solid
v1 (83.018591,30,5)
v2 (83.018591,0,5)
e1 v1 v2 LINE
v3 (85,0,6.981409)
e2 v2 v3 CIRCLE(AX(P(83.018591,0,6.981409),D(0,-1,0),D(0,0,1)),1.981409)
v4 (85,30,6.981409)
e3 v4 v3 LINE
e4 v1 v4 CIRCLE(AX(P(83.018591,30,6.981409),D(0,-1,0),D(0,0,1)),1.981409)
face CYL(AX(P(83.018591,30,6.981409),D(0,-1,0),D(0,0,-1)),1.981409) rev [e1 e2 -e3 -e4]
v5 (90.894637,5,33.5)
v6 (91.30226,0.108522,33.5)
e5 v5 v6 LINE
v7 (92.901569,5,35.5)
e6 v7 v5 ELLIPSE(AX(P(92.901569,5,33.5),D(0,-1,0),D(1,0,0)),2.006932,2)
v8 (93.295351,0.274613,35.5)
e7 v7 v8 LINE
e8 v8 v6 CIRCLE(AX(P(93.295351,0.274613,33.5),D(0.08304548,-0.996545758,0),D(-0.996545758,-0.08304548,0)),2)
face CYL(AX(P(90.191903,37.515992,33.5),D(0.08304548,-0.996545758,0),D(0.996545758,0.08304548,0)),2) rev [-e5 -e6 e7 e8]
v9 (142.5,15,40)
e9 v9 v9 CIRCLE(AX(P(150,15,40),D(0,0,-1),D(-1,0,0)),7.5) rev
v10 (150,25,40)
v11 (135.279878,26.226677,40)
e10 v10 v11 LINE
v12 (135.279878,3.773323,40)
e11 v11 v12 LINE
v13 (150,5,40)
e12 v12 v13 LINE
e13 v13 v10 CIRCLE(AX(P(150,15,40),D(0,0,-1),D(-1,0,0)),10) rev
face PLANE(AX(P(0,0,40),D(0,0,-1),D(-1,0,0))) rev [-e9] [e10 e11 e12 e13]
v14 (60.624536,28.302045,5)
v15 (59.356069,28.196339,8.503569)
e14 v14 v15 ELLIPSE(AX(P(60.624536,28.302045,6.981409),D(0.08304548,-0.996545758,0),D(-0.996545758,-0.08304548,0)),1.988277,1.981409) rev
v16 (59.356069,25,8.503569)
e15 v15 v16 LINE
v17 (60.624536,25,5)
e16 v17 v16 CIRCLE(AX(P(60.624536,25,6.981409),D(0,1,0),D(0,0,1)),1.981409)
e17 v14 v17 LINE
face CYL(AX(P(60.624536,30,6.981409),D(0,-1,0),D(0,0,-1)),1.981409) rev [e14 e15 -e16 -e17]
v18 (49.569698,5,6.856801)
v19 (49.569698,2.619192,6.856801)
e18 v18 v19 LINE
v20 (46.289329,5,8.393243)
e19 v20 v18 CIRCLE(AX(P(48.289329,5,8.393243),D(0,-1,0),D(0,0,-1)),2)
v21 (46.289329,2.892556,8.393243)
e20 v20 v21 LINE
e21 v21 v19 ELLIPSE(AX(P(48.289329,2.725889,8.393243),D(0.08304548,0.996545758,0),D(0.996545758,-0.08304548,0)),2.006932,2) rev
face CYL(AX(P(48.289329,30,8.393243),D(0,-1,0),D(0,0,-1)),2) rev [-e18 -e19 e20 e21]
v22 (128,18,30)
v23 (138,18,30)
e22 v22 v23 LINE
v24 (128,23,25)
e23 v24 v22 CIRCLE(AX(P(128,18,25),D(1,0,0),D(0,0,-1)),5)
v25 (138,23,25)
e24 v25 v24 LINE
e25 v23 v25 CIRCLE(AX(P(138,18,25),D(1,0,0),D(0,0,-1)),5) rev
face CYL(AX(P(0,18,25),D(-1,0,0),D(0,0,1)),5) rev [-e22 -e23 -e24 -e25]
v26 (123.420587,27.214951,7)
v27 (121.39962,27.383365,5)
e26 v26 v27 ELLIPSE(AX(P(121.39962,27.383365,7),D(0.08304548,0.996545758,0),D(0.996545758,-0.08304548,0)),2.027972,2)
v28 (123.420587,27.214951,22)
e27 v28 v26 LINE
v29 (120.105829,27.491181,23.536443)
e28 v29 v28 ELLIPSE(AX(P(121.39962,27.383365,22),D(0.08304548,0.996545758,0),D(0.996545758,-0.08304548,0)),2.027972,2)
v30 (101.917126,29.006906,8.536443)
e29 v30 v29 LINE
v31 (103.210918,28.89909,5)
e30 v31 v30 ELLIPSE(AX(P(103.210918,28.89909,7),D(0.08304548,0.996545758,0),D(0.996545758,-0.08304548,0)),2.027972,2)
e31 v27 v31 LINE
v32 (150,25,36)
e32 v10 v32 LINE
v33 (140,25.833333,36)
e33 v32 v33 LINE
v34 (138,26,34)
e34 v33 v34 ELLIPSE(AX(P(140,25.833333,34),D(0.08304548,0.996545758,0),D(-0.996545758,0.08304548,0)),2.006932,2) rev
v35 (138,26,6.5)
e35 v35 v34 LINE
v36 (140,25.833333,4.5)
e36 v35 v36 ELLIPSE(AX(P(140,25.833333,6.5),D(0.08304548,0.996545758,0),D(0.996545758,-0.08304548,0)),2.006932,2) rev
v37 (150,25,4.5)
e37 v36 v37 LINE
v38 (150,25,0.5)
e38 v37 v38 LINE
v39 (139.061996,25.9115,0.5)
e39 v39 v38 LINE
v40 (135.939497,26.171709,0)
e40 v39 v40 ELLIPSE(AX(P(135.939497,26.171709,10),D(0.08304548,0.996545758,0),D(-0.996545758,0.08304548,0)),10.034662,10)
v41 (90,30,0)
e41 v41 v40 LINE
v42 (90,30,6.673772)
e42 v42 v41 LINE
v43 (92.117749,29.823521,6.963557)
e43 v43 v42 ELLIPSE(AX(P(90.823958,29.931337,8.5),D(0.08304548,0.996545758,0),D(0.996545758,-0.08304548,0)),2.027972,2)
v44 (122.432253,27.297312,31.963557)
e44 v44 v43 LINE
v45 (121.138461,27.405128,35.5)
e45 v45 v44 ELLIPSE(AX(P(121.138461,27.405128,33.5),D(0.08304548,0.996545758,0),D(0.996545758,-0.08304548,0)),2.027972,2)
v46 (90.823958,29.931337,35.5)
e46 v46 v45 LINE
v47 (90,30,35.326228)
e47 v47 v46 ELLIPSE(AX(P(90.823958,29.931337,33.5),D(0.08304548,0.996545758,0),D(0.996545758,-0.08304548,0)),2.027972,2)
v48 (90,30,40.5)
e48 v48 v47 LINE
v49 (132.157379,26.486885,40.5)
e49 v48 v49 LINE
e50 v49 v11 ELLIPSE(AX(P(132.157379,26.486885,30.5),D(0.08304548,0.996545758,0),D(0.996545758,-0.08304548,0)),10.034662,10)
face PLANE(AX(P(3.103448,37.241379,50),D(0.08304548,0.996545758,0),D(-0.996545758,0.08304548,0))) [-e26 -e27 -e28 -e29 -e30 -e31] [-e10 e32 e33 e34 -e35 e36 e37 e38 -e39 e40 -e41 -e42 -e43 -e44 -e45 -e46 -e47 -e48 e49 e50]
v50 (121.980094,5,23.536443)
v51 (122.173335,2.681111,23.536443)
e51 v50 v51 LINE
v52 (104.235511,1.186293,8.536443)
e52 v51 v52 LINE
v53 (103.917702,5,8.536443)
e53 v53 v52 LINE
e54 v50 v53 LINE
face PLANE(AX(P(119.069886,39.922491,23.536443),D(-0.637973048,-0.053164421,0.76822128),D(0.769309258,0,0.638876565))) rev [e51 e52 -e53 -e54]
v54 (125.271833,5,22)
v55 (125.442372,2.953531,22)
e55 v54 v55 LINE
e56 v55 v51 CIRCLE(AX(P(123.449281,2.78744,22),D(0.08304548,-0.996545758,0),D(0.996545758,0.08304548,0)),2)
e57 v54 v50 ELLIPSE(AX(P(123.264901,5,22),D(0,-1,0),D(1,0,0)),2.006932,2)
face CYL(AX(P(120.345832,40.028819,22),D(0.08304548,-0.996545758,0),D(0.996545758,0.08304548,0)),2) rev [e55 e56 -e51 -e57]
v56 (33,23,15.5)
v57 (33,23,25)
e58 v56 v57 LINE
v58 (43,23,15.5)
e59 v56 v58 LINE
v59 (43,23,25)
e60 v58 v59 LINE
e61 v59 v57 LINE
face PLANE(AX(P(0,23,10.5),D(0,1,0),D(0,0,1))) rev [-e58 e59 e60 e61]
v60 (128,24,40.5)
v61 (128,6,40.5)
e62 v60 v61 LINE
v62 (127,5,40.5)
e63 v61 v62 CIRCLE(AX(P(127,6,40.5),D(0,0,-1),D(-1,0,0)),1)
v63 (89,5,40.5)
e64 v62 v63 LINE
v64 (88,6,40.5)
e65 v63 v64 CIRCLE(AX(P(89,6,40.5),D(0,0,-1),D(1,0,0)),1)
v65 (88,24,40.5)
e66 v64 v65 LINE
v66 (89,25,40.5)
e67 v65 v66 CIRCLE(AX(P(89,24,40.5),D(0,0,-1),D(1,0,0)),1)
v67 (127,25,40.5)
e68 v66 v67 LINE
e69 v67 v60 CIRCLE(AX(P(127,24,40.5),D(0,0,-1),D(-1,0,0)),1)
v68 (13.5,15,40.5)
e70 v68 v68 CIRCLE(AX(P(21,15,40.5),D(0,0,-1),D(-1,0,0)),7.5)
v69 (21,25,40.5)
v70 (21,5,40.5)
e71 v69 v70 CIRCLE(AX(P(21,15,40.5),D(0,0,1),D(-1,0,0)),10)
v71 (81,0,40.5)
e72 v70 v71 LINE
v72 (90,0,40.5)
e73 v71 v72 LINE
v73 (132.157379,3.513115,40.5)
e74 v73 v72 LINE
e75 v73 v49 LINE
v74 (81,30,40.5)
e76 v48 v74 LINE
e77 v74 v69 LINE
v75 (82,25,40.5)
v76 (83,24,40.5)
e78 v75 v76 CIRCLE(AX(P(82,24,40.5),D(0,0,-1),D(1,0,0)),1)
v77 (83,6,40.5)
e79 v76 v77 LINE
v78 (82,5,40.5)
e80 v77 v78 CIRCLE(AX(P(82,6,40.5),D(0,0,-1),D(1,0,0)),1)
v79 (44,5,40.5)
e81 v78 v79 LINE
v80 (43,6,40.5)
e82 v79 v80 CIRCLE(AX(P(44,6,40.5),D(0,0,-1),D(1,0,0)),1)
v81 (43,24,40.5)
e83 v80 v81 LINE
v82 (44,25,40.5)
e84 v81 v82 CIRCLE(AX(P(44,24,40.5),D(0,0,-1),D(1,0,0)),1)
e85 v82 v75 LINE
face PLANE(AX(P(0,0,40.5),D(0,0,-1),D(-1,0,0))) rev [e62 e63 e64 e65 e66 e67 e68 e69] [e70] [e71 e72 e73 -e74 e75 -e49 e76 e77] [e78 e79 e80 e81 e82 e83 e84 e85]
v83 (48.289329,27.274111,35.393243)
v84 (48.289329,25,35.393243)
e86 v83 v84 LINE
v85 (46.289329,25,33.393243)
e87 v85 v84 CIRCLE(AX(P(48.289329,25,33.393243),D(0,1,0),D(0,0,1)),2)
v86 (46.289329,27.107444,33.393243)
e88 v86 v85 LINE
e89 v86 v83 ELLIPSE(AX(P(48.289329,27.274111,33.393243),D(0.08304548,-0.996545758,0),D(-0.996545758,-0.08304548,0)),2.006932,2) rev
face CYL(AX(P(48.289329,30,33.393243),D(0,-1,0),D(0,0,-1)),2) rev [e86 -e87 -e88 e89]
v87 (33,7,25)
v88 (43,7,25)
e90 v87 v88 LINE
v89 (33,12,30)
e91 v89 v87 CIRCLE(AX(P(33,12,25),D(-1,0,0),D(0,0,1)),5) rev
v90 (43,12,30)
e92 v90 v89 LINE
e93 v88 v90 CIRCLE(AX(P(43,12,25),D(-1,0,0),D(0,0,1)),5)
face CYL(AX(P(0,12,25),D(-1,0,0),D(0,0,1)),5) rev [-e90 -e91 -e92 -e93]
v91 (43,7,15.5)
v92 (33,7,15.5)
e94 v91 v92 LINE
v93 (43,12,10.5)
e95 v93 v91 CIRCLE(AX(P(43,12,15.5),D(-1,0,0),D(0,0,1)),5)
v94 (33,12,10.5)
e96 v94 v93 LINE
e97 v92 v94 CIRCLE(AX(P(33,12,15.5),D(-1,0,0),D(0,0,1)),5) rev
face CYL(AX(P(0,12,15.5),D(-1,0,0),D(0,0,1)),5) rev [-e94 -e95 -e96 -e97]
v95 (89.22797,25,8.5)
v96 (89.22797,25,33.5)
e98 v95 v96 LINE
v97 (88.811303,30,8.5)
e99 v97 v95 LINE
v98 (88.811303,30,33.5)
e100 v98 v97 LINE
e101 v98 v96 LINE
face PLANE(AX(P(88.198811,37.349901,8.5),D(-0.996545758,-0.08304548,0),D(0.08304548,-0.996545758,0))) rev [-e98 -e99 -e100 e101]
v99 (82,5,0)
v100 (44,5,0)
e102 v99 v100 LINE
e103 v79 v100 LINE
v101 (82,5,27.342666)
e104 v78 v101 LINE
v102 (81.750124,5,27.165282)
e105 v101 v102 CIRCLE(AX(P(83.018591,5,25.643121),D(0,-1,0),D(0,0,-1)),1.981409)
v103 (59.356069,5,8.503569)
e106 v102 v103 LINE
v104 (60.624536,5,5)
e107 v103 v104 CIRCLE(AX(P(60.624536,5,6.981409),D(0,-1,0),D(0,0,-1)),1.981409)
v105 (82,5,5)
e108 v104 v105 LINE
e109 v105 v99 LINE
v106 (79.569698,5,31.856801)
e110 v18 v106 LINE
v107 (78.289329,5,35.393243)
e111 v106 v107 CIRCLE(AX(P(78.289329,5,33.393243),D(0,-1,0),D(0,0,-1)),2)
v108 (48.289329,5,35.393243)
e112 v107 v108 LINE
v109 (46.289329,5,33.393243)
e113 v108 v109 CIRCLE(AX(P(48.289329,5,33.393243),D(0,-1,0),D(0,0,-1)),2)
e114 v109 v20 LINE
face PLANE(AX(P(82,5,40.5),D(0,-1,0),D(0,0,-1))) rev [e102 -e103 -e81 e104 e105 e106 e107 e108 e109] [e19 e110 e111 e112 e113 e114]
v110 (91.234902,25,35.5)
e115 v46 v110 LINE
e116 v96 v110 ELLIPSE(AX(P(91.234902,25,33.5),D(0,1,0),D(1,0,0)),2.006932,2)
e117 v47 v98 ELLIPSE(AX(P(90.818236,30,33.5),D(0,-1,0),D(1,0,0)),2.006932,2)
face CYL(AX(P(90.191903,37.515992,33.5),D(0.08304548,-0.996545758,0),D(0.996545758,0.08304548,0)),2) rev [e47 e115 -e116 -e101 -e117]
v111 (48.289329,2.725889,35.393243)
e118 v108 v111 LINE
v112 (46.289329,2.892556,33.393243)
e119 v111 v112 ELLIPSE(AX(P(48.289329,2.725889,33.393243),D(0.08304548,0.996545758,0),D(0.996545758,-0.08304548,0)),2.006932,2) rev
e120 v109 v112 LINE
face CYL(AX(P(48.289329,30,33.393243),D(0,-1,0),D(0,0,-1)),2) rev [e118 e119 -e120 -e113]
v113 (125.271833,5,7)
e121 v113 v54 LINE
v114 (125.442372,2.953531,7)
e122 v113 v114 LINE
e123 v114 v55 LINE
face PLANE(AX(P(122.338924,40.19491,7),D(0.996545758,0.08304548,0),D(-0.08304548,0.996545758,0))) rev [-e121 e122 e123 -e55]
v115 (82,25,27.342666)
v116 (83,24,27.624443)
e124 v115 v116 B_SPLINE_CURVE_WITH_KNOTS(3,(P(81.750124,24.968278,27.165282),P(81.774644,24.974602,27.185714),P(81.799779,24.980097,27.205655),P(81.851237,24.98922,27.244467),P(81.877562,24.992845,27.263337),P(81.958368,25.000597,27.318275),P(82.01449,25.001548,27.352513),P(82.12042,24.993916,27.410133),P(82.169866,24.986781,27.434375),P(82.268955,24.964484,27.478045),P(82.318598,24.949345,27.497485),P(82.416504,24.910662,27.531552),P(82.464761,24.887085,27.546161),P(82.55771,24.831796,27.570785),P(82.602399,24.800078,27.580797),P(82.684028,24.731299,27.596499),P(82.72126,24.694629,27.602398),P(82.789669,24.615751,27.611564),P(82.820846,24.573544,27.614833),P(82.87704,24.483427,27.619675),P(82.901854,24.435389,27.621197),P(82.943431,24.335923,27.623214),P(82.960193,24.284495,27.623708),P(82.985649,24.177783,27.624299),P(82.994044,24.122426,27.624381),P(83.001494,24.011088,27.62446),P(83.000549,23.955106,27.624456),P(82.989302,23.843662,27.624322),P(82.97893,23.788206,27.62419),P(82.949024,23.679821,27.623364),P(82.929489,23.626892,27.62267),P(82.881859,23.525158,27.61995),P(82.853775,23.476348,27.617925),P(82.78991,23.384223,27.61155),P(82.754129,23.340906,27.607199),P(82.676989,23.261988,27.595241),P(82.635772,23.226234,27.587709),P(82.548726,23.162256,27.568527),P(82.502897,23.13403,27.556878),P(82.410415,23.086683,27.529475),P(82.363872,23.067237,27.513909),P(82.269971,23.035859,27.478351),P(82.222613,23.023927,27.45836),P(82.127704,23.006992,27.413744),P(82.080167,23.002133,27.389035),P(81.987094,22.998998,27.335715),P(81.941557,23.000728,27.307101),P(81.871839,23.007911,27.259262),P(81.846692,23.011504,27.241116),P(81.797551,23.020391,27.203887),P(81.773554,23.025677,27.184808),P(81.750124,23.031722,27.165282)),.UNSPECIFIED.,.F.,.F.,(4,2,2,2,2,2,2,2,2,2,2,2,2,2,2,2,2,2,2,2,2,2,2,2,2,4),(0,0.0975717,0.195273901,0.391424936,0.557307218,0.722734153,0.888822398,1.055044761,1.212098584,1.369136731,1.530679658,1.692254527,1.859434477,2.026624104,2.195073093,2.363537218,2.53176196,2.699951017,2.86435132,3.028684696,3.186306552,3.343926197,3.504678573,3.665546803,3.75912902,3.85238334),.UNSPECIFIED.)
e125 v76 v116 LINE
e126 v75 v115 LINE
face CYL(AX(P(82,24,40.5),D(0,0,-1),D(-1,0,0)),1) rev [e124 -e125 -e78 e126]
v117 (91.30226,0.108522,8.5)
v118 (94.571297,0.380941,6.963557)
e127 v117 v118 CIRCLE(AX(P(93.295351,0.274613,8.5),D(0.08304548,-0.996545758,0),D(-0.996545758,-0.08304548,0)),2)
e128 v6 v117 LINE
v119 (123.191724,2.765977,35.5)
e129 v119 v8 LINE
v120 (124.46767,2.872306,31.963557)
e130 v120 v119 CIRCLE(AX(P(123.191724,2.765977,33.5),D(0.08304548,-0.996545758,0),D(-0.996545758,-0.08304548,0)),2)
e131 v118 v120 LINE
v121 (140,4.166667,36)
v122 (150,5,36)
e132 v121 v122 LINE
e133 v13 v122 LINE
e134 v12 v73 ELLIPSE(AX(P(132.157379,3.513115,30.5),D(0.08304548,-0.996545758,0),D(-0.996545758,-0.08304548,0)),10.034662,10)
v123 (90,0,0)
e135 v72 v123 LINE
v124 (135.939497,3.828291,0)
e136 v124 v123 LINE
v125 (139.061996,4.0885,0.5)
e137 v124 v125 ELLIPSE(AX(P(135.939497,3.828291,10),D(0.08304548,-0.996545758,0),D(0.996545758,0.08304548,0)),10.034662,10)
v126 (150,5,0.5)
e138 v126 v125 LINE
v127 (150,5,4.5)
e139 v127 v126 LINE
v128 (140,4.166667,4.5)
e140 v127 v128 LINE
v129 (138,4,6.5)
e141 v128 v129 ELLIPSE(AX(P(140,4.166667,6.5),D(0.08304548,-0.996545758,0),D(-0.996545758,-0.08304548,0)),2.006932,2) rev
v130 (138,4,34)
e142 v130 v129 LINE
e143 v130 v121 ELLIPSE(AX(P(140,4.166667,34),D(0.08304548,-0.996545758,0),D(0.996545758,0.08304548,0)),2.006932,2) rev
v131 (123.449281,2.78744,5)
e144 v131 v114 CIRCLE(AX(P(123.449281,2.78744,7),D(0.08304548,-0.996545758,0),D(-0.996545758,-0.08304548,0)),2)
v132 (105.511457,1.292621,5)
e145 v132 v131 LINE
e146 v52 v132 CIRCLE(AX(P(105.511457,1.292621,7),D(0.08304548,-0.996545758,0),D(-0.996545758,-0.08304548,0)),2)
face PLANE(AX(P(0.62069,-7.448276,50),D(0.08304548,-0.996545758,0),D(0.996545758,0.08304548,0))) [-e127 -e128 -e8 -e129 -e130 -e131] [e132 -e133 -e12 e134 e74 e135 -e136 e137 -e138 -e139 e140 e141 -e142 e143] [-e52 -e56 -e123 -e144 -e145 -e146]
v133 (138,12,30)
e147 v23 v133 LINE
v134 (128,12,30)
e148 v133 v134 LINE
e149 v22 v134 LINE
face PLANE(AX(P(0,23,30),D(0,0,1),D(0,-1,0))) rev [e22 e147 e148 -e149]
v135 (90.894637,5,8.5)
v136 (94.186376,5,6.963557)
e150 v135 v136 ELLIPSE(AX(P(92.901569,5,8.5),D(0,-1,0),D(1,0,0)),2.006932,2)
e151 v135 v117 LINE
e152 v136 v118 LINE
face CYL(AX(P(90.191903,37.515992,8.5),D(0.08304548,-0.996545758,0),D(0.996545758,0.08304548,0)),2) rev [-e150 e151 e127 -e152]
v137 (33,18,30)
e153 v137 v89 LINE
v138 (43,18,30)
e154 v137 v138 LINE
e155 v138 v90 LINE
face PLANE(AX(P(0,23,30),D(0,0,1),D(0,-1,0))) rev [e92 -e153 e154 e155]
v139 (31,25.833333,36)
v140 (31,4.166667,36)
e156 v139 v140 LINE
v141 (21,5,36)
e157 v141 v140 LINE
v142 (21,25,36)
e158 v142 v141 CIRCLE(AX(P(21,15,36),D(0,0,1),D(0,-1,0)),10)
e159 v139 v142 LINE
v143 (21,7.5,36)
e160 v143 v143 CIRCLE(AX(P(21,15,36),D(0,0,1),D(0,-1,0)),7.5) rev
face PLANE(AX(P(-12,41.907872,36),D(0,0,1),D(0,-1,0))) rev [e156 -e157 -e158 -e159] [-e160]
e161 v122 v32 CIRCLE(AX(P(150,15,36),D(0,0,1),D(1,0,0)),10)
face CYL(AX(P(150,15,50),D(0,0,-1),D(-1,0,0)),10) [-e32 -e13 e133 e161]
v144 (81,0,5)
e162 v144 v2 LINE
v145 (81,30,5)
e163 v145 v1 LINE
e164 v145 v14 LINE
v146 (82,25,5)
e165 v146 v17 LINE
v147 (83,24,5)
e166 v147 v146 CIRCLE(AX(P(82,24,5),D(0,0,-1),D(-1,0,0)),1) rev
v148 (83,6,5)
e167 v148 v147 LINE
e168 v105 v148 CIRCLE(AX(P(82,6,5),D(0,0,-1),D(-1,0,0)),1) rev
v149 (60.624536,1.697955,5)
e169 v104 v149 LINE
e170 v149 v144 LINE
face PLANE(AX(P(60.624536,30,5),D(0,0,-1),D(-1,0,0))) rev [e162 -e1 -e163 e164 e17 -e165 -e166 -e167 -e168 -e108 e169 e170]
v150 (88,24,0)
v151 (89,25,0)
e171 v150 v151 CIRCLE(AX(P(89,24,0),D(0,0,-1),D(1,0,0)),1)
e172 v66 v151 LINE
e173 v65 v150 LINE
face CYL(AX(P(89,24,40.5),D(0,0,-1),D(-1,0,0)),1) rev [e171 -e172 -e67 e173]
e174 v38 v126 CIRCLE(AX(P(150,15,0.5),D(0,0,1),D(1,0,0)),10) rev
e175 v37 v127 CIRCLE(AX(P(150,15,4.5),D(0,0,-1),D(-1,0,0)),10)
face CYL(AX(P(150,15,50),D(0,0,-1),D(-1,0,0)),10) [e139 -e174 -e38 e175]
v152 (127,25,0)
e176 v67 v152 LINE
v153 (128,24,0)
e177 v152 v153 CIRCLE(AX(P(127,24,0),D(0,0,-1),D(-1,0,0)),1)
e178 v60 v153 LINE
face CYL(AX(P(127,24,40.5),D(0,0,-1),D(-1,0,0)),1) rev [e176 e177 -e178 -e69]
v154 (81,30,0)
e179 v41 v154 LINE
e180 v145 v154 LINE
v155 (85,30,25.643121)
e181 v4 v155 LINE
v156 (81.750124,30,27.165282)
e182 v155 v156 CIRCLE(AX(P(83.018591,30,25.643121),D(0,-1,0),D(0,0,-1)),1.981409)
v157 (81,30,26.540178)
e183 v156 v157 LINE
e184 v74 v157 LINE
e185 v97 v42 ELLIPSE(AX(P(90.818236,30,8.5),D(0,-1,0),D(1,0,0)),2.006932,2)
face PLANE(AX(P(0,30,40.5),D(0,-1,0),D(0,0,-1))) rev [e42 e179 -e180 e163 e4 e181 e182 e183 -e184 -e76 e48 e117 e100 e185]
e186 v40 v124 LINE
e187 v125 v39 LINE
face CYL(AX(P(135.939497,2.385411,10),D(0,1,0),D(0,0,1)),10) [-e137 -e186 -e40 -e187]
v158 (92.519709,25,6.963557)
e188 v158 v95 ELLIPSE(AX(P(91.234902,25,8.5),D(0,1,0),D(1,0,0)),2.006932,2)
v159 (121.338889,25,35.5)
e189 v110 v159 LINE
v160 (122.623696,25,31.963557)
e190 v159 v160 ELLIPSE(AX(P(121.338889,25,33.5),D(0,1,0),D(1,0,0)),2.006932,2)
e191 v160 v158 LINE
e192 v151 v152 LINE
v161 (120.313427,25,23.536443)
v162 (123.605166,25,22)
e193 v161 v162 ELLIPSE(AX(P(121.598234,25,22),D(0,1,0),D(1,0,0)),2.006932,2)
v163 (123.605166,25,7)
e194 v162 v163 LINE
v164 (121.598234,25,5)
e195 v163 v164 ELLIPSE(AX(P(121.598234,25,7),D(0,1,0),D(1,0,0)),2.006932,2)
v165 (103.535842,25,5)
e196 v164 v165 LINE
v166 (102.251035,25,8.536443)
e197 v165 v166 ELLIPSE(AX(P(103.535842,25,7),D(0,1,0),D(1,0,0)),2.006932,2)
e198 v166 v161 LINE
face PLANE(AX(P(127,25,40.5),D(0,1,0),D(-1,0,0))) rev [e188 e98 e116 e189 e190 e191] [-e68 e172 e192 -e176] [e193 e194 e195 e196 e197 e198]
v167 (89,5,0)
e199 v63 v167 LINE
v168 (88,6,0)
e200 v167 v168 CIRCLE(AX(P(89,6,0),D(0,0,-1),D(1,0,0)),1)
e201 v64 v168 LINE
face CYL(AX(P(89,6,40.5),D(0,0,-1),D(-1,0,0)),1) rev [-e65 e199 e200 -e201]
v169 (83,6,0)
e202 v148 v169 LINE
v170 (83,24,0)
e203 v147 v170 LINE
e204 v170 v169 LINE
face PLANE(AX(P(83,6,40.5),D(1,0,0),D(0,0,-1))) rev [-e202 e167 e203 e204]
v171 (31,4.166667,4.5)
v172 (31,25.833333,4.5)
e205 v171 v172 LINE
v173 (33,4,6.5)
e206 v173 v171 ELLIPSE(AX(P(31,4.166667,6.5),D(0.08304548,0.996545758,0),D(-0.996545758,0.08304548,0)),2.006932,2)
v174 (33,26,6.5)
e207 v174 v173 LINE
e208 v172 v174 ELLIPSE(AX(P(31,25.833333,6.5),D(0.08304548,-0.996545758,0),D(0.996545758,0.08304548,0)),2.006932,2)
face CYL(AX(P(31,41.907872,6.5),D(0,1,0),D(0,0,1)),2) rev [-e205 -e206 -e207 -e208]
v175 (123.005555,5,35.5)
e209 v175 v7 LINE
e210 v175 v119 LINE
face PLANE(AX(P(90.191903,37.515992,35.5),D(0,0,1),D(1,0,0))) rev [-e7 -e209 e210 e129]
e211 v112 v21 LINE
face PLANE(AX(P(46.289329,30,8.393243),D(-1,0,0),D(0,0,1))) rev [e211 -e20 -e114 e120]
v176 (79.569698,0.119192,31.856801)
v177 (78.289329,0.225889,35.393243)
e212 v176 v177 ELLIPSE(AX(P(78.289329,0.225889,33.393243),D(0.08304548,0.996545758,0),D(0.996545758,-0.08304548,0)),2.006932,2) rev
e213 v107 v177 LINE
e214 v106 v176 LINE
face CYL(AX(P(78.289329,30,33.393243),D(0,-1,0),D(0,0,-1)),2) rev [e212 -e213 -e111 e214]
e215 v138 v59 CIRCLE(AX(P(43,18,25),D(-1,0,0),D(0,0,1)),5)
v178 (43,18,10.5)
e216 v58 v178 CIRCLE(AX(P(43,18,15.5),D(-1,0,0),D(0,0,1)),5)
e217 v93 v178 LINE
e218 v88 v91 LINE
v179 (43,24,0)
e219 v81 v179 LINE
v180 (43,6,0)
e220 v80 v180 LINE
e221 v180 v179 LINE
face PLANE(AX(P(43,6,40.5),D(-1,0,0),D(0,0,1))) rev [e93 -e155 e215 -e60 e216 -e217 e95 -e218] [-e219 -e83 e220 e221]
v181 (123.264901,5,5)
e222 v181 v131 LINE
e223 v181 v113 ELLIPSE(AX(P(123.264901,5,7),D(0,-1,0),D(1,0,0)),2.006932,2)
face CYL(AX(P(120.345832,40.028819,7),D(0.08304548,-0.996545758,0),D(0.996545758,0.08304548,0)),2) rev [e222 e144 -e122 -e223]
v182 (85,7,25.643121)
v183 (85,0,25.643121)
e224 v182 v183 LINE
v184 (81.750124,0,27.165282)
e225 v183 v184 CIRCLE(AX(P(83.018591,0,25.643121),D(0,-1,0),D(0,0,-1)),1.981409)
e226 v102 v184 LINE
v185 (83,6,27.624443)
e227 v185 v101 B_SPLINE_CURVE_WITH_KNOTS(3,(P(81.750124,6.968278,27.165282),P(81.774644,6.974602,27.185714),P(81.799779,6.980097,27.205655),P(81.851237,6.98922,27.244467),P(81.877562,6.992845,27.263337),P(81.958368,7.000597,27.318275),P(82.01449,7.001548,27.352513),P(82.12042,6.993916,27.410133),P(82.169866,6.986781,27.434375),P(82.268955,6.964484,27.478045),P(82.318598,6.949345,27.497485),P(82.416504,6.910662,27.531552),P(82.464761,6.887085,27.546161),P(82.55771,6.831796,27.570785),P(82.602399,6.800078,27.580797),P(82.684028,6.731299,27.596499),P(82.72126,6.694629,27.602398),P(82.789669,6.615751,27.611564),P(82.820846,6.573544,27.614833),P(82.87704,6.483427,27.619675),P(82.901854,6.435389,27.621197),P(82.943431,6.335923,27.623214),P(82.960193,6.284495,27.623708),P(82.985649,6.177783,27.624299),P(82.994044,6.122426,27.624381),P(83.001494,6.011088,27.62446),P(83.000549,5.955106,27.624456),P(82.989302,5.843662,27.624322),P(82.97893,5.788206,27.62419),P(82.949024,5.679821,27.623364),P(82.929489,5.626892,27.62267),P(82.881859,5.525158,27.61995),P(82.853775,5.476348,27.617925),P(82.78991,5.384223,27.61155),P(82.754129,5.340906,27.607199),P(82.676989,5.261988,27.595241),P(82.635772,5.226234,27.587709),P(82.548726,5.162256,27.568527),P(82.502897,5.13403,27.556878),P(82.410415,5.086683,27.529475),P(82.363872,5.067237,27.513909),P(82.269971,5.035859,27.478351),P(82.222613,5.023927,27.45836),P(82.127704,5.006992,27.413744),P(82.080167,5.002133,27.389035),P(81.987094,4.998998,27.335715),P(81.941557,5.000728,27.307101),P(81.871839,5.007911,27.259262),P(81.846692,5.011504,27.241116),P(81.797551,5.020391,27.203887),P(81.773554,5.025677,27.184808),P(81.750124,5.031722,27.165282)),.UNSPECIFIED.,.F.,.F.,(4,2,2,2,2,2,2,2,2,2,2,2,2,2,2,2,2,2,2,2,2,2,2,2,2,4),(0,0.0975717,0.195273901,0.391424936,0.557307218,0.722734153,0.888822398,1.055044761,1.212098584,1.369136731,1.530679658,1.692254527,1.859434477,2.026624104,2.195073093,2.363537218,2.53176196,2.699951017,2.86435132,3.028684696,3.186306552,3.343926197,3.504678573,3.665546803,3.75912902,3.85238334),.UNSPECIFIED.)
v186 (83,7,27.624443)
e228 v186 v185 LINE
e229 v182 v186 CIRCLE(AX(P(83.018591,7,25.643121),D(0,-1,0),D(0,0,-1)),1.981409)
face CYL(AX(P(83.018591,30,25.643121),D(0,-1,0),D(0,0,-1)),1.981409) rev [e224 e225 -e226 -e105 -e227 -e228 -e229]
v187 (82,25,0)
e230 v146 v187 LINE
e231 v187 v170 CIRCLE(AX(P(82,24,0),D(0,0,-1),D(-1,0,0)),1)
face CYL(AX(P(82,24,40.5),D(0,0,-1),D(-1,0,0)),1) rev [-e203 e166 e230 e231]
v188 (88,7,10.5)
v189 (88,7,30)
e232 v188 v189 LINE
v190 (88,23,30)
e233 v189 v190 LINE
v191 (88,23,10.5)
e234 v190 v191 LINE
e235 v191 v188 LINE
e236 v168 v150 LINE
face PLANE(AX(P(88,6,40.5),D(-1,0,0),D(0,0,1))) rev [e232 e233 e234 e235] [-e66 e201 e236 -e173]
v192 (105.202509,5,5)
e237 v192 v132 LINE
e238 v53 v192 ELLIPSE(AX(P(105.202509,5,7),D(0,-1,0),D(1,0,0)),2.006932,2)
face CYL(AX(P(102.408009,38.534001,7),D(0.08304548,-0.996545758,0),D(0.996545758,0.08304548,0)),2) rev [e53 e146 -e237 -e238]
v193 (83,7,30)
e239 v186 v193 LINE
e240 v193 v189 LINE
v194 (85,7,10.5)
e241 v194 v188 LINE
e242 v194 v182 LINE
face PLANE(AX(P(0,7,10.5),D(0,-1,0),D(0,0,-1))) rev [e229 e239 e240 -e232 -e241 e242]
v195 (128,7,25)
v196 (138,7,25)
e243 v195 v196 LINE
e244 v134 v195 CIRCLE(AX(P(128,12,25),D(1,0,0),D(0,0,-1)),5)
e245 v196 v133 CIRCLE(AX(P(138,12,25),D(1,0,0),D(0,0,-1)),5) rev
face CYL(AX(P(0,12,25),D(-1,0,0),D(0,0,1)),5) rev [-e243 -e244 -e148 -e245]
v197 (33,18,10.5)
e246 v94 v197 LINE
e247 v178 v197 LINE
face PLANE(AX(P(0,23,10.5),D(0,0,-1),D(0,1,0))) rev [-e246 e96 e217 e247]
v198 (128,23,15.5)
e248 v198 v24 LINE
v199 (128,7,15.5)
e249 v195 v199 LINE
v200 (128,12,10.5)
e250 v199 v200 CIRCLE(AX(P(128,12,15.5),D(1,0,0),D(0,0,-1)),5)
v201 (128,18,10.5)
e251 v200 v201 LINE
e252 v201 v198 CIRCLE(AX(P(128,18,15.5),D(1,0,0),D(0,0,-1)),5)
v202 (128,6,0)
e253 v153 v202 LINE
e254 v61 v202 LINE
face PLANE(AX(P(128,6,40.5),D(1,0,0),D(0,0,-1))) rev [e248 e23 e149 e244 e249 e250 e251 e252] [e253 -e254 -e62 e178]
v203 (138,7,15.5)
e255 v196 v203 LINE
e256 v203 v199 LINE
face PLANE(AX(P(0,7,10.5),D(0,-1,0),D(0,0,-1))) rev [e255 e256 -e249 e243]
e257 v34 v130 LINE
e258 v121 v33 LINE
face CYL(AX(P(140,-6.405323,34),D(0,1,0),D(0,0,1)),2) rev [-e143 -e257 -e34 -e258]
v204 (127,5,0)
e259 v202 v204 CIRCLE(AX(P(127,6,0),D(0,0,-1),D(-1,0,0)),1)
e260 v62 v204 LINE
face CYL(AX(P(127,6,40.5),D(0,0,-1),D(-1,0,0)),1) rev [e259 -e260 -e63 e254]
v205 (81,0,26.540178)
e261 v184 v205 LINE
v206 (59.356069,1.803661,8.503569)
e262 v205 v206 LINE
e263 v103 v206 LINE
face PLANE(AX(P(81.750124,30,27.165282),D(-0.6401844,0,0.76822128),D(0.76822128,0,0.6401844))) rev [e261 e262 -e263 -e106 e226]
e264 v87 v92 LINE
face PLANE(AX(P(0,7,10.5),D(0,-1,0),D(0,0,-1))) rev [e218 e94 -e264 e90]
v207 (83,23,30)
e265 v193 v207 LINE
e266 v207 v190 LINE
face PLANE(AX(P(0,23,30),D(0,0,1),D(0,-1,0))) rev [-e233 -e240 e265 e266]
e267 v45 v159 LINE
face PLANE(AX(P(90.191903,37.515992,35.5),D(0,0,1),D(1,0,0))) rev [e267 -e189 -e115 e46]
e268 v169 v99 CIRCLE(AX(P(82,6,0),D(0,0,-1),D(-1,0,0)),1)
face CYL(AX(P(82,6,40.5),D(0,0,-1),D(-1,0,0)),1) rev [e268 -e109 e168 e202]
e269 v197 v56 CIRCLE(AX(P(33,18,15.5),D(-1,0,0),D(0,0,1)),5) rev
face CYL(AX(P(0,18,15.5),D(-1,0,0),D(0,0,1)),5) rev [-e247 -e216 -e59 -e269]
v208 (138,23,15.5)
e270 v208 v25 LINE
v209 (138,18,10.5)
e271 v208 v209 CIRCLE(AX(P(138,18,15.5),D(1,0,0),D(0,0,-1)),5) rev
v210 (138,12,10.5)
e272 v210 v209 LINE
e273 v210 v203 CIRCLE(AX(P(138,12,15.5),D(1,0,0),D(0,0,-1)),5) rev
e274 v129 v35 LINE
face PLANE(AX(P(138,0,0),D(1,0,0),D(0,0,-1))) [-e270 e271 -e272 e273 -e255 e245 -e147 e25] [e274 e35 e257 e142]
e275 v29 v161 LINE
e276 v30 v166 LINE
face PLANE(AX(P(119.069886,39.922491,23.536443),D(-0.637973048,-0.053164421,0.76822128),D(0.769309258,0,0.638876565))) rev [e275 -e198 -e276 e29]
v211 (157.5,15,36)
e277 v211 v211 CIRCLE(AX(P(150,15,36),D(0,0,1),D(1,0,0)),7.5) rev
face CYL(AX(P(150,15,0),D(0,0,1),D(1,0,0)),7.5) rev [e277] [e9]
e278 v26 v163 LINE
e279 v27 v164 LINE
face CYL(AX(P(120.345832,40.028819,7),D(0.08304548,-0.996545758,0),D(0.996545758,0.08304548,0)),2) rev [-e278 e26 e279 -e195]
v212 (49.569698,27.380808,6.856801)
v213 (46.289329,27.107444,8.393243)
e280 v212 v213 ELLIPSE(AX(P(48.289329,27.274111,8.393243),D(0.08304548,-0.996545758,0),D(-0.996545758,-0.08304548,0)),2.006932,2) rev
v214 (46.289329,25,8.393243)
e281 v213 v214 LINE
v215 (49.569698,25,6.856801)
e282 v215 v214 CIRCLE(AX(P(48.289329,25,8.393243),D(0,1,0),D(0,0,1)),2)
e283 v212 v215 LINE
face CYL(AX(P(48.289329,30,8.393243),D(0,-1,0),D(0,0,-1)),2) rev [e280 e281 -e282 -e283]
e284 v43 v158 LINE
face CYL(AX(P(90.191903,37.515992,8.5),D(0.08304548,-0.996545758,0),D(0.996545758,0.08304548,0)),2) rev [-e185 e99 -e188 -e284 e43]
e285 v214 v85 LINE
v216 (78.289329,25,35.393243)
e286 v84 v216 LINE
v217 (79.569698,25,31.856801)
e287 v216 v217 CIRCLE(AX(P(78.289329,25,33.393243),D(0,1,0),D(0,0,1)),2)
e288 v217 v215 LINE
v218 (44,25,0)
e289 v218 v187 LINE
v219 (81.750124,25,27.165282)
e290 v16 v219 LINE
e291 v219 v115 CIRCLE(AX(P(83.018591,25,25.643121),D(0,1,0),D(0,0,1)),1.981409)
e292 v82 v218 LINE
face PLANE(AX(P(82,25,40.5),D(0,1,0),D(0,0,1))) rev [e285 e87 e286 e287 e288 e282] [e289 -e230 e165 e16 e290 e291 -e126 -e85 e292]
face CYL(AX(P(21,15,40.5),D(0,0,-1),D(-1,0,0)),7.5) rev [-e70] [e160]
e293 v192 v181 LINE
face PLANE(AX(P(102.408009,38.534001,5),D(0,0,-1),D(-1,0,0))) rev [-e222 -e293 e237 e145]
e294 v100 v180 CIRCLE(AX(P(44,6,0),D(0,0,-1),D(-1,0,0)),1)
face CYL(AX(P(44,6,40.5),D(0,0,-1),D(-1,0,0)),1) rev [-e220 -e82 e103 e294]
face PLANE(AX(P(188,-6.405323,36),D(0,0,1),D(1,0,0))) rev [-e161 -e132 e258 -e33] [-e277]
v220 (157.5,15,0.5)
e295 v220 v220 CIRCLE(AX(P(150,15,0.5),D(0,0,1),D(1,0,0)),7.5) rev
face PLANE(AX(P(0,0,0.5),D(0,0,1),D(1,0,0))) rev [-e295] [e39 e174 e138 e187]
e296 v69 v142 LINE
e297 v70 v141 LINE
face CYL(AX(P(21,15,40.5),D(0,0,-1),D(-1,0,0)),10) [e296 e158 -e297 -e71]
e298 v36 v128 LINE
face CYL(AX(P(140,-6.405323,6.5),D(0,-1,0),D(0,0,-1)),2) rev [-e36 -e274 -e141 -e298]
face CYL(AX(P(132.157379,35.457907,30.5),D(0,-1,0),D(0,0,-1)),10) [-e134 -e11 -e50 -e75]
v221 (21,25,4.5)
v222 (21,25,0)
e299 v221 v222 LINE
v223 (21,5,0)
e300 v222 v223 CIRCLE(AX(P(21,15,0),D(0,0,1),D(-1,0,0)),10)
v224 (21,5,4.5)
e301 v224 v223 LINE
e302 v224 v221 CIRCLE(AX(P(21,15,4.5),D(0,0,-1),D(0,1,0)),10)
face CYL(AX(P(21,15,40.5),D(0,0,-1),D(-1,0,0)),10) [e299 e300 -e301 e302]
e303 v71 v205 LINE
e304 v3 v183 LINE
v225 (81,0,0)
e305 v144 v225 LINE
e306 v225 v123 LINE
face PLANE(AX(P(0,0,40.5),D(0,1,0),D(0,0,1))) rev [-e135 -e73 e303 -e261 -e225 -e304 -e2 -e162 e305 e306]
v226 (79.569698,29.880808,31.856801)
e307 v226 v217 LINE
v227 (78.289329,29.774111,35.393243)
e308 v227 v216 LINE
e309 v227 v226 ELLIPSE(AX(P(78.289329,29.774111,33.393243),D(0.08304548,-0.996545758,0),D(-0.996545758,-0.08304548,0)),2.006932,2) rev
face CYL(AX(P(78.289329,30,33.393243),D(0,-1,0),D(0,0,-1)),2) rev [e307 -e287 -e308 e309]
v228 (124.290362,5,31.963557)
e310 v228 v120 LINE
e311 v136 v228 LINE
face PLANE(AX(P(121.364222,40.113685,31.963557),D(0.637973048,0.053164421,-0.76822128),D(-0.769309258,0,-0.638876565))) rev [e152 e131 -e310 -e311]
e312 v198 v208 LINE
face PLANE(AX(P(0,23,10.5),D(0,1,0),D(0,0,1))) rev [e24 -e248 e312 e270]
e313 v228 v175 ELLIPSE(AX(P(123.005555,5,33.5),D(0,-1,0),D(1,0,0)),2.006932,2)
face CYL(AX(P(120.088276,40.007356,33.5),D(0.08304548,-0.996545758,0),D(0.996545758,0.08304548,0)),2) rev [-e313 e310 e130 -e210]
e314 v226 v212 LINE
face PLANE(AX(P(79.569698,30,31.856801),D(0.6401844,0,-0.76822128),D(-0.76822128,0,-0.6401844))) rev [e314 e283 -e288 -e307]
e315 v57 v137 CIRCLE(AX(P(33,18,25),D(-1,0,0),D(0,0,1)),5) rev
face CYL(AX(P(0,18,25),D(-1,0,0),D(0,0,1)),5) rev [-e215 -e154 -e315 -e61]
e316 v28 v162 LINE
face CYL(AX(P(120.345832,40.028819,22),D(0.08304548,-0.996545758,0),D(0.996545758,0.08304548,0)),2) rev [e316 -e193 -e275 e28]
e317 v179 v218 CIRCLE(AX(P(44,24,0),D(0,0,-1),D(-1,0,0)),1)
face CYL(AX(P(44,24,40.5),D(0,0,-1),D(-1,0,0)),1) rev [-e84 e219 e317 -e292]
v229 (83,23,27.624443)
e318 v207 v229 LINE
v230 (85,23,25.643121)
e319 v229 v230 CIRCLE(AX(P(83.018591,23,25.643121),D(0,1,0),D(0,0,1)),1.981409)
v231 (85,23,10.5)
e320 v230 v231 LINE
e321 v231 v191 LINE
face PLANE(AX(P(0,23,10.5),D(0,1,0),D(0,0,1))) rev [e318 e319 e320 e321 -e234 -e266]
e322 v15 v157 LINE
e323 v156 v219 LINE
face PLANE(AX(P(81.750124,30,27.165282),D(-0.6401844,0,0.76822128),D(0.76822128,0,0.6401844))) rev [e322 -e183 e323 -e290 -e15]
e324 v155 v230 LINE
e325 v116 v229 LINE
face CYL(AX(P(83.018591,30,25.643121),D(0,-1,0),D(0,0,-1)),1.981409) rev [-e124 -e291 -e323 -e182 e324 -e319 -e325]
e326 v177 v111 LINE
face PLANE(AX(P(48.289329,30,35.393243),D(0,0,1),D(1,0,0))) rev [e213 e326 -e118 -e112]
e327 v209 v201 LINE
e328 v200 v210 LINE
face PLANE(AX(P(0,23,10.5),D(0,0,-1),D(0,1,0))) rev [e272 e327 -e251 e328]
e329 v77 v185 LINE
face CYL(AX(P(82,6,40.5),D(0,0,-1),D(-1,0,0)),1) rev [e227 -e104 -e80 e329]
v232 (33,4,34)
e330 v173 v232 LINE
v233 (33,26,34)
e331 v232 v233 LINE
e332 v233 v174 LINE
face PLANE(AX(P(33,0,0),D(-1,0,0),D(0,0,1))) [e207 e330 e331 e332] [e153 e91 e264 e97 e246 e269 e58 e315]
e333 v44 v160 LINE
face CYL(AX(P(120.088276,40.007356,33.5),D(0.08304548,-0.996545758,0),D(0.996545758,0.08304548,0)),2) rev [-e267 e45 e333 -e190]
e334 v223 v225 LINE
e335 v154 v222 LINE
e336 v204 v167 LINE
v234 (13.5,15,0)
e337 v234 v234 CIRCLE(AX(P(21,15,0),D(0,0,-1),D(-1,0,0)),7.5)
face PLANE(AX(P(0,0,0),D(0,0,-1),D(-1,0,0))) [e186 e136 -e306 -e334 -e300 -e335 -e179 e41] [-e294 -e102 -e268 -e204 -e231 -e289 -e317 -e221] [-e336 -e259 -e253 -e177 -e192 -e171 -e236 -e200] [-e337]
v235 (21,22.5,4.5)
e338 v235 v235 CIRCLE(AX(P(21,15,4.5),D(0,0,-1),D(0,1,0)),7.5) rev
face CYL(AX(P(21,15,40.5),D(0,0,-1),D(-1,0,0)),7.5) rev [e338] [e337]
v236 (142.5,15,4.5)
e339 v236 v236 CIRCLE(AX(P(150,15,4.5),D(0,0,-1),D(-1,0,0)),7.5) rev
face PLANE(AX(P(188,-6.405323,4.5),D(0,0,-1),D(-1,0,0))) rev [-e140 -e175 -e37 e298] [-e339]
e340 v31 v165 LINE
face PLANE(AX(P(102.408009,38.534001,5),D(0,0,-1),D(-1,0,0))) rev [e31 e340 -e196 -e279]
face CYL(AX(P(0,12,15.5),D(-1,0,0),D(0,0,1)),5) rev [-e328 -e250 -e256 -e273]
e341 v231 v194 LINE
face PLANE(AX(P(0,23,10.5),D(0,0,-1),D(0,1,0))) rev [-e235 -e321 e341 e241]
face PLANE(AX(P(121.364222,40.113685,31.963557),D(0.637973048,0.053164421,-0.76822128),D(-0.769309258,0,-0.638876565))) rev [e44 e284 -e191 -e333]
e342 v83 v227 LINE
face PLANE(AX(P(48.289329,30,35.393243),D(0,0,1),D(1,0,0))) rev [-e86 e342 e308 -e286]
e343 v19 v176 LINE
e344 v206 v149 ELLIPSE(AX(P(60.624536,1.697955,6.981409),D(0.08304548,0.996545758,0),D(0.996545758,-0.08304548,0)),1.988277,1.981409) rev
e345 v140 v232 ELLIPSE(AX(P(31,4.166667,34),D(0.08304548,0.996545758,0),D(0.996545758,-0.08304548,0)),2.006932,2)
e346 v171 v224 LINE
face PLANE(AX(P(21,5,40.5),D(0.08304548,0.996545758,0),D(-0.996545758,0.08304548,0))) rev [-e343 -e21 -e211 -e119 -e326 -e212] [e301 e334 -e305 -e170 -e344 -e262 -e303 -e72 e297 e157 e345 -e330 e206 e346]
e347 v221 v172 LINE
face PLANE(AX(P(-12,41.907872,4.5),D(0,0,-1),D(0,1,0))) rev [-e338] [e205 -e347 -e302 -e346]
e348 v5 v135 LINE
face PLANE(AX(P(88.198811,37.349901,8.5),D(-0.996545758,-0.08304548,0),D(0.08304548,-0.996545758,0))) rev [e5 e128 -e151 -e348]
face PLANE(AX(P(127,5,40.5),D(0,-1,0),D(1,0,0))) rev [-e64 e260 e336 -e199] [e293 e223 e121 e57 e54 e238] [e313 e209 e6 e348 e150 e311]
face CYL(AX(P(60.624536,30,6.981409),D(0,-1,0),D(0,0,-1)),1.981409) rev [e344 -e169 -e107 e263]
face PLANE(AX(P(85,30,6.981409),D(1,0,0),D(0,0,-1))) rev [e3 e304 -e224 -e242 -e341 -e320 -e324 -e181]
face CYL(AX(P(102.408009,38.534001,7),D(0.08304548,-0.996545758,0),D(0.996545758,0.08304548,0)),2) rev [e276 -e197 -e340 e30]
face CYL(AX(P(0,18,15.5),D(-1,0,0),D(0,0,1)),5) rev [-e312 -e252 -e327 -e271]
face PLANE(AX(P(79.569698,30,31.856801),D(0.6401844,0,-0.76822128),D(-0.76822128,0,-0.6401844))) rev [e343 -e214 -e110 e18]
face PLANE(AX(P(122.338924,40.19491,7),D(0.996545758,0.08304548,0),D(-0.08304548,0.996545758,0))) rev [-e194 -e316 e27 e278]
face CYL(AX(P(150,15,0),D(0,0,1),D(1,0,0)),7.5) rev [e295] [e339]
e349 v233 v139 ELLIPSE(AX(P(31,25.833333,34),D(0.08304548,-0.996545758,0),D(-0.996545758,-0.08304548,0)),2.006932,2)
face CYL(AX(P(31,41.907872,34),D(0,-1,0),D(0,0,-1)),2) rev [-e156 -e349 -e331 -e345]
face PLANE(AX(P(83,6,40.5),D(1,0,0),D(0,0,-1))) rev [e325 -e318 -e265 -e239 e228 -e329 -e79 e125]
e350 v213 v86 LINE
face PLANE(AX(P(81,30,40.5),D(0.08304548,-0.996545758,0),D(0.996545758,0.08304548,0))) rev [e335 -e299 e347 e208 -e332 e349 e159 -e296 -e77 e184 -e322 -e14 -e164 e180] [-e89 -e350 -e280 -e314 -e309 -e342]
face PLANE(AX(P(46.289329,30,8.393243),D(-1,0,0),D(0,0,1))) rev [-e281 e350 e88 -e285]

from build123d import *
from build123d.topology import SkipClean

# Parameters (mm, degrees)
ESQUISSE1_W                   = 150
ESQUISSE1_H                   = 30
BOSS_EXTRU_1_DEPTH            = 40.5
BOSS_EXTRU_2_DEPTH            = 40.5
ENL_V_MAT_EXTRU_2_DEPTH       = 173.526084984
ENL_V_START                   = -138
ESQUISSE4_W                   = 31.5
ESQUISSE4_H                   = 44.902895409
ENL_V_MAT_EXTRU_3_DEPTH       = 50
ENL_V_START_2                 = -50
ENL_V_MAT_EXTRU_4_DEPTH       = 50
ESQUISSE6_W                   = 40.808644438
ESQUISSE6_H                   = 31.212282358
ENL_V_MAT_EXTRU_5_DEPTH       = 0.5
ESQUISSE7_W                   = 30.686861219
ESQUISSE7_H                   = 47.66257168
ENL_V_MAT_EXTRU_6_DEPTH       = 0.5
ENL_V_MAT_EXTRU_7_DEPTH       = 168.750558866
CONG_1_R                      = 2
CONG_2_R                      = 10
ESQUISSE9_W                   = 19.5
ESQUISSE9_H                   = 16
ENL_V_MAT_EXTRU_8_DEPTH       = 147.915792208
ENL_V_MAT_EXTRU_9_DEPTH       = 169.654641001
CONG_4_R                      = 5
ENL_V_MAT_EXTRU_10_DEPTH      = 168.750558866
ENL_V_MAT_EXTRU_10_DEPTH_BACK = 168.750558866
ENL_V_MAT_EXTRU_11_DEPTH      = 168.750558866
ESQUISSE13_R                  = 7.5
ENL_V_MAT_EXTRU_12_DEPTH      = 168.750558908
ENL_V_MAT_EXTRU_13_DEPTH      = 168.750558908
ENL_V_START_3                 = -105
ESQUISSE15_W                  = 31.5
ESQUISSE15_H                  = 62.544521206
ENL_V_MAT_EXTRU_14_DEPTH      = 45
CONG_5_R                      = 2
CONG_6_R                      = 5


with BuildPart() as part:
    # Esquisse1 → Boss.-Extru.1 (new body)
    with BuildSketch(Plane.XY):
        with Locations((75, 15)):
            Rectangle(ESQUISSE1_W, ESQUISSE1_H)
    extrude(amount=BOSS_EXTRU_1_DEPTH)

    # Esquisse3 → Boss.-Extru.2 (add, through all)
    with BuildSketch(Plane.XY.offset(40.5)):
        with BuildLine():
            Line((150, 7.5), (150, 0))
            ThreePointArc((150, 0), (165, 15), (150, 30))
            Line((150, 30), (150, 22.5))
            ThreePointArc((150, 22.5), (155.303300859, 20.303300859), (157.5, 15))
            ThreePointArc((157.5, 15), (155.303300859, 9.696699141), (150, 7.5))
        make_face()
    extrude(amount=-BOSS_EXTRU_2_DEPTH)

    # Esquisse3<3> → Enlèv. mat.-Extru.2 (cut, through all)
    with SkipClean():  # the faces are left unmerged after this step: merging them gives an invalid solid
        with BuildSketch(Plane.XY.offset(40.5)):
            with BuildLine():
                Line((150, 22.5), (150, 7.5))
                ThreePointArc((150, 7.5), (155.303300859, 9.696699141), (157.5, 15))
                ThreePointArc((157.5, 15), (155.303300859, 20.303300859), (150, 22.5))
            make_face()
            with BuildLine():
                ThreePointArc((150, 22.5), (142.5, 15), (150, 7.5))
                Line((150, 7.5), (150, 22.5))
            make_face()
        extrude(amount=-ENL_V_MAT_EXTRU_2_DEPTH, mode=Mode.SUBTRACT)

    # Esquisse4 → Enlèv. mat.-Extru.3 (cut)
    with BuildSketch(Plane.ZY.offset(ENL_V_START)):
        with Locations((20.25, 16.046124804)):
            Rectangle(ESQUISSE4_W, ESQUISSE4_H)
    extrude(amount=-ENL_V_MAT_EXTRU_3_DEPTH, mode=Mode.SUBTRACT)

    # Esquisse5 → Enlèv. mat.-Extru.4 (cut)
    with BuildSketch(Plane(origin=(0, 0, 0), x_dir=(-1, 0, 0), z_dir=(0, 0, -1)).offset(ENL_V_START_2)):
        with BuildLine():
            Line((-90, 0), (-150, 5))
            ThreePointArc((-150, 5), (-160, 15), (-150, 25))
            Line((-150, 25), (-90, 30))
            Line((-90, 30), (-150, 30))
            ThreePointArc((-150, 30), (-165, 15), (-150, 0))
            Line((-150, 0), (-90, 0))
        make_face()
    extrude(amount=ENL_V_MAT_EXTRU_4_DEPTH, mode=Mode.SUBTRACT)

    # Esquisse6 → Enlèv. mat.-Extru.5 (cut)
    with BuildSketch(Plane(origin=(0, 0, 0), x_dir=(-1, 0, 0), z_dir=(0, 0, -1))):
        with Locations((-159.466318707, 17.991552194)):
            Rectangle(ESQUISSE6_W, ESQUISSE6_H)
    extrude(amount=-ENL_V_MAT_EXTRU_5_DEPTH, mode=Mode.SUBTRACT)

    # Esquisse7 → Enlèv. mat.-Extru.6 (cut)
    with BuildSketch(Plane.XY.offset(40.5)):
        with Locations((150.623308265, 11.626621639)):
            Rectangle(ESQUISSE7_W, ESQUISSE7_H)
    extrude(amount=-ENL_V_MAT_EXTRU_6_DEPTH, mode=Mode.SUBTRACT)

    # Esquisse8 → Enlèv. mat.-Extru.7 (cut, through all)
    with BuildSketch(Plane(origin=(0, 0, 0), x_dir=(-1, 0, 0), z_dir=(0, 0, -1))):
        with BuildLine():
            Line((-127, 5), (-89, 5))
            ThreePointArc((-89, 5), (-88.292893219, 5.292893219), (-88, 6))
            Line((-88, 6), (-88, 24))
            ThreePointArc((-88, 24), (-88.292893219, 24.707106781), (-89, 25))
            Line((-89, 25), (-127, 25))
            ThreePointArc((-127, 25), (-127.707106781, 24.707106781), (-128, 24))
            Line((-128, 24), (-128, 6))
            ThreePointArc((-128, 6), (-127.707106781, 5.292893219), (-127, 5))
        make_face()
    extrude(amount=-ENL_V_MAT_EXTRU_7_DEPTH, mode=Mode.SUBTRACT)

    # Congé1
    cong_1_edges = [part.edges().sort_by_distance(p)[0] for p in [
        (138, 15, 36),
        (138, 15, 4.5),
    ]]
    fillet(cong_1_edges, radius=CONG_1_R)

    # Congé2
    # the kernel refuses this fillet: 10 mm, written as the material it takes off along each edge
    with BuildSketch(Plane(origin=(139.061996488, -3.717747791, 0), x_dir=(-1, 0, 0), z_dir=(0, 1, 0))) as cong_2_piece_1:
        with BuildLine():
            CenterArc((3.122498999, 10), CONG_2_R, 251.805127661, 18.194872339)
            Line((0, 0.5), (-0.06244998, 0.31))
            ThreePointArc((-0.06244998, 0.31), (-0.2, 0.25), (-0.2, 0))
            Line((-0.2, 0), (0, -0.2))
            Line((0, -0.2), (3.122498999, -0.2))
            Line((3.122498999, -0.2), (3.122498999, 0))
        make_face()
    extrude(amount=37.435495581, mode=Mode.SUBTRACT)
    with BuildSketch(Plane(origin=(135.279877656, 34.03292436, 40.5), x_dir=(-2.2168933355567372e-12, 0, -1.0), z_dir=(0, -1, 0))) as cong_2_piece_2:
        with BuildLine():
            CenterArc((10, -3.122498999), CONG_2_R, 161.805127661, 18.194872339)
            Line((0, -3.122498999), (-0.2, -3.122498999))
            Line((-0.2, -3.122498999), (-0.2, 0))
            Line((-0.2, 0), (0, 0.2))
            ThreePointArc((0, 0.2), (0.25, 0.2), (0.31, 0.06244998))
            Line((0.31, 0.06244998), (0.5, 0))
        make_face()
    extrude(amount=38.06584872, mode=Mode.SUBTRACT)

    # Esquisse9 → Enlèv. mat.-Extru.8 (cut, through all)
    with BuildSketch(Plane(origin=(138, 0, 0), x_dir=(0, 0, -1), z_dir=(1, 0, 0))):
        with Locations((-20.25, 15)):
            Rectangle(ESQUISSE9_W, ESQUISSE9_H)
    extrude(amount=-ENL_V_MAT_EXTRU_8_DEPTH, mode=Mode.SUBTRACT)

    # Esquisse10 → Enlèv. mat.-Extru.9 (cut, through all)
    with BuildSketch(Plane(origin=(0.620689655, -7.448275862, 0), x_dir=(0.9965457582448797, 0.08304547985373982, 0), z_dir=(0.08304547985373982, -0.9965457582448797, 0))):
        with BuildLine():
            Line((121.973972493, 23.536442559), (103.973972493, 8.536442559))
            ThreePointArc((103.973972493, 8.536442559), (103.373798137, 6.319149472), (105.254341292, 5))
            Line((105.254341292, 5), (123.254341292, 5))
            ThreePointArc((123.254341292, 5), (124.668554855, 5.585786438), (125.254341292, 7))
            Line((125.254341292, 7), (125.254341292, 22))
            ThreePointArc((125.254341292, 22), (124.102652085, 23.811178842), (121.973972493, 23.536442559))
        make_face()
        with BuildLine():
            Line((124.276260675, 31.963557441), (94.276260675, 6.963557441))
            ThreePointArc((94.276260675, 6.963557441), (92.147581083, 6.688821158), (90.995891876, 8.5))
            Line((90.995891876, 8.5), (90.995891876, 33.5))
            ThreePointArc((90.995891876, 33.5), (91.581678313, 34.914213562), (92.995891876, 35.5))
            Line((92.995891876, 35.5), (122.995891876, 35.5))
            ThreePointArc((122.995891876, 35.5), (124.876435031, 34.180850528), (124.276260675, 31.963557441))
        make_face()
    extrude(amount=-ENL_V_MAT_EXTRU_9_DEPTH, mode=Mode.SUBTRACT)

    # Congé4
    cong_4_edges = [part.edges().sort_by_distance(p)[0] for p in [
        (133, 23, 10.5),
        (133, 7, 10.5),
        (133, 7, 30),
        (133, 23, 30),
    ]]
    fillet(cong_4_edges, radius=CONG_4_R)

    # Esquisse11 → Enlèv. mat.-Extru.10 (cut, two sides: drawn at the far end of the back side and taken through both)
    with BuildSketch(Plane(origin=(0, 0, 0), x_dir=(-1, 0, 0), z_dir=(0, 0, -1)).offset(-ENL_V_MAT_EXTRU_10_DEPTH_BACK)):
        with BuildLine():
            Line((-82, 5), (-44, 5))
            ThreePointArc((-44, 5), (-43.292893219, 5.292893219), (-43, 6))
            Line((-43, 6), (-43, 24))
            ThreePointArc((-43, 24), (-43.292893219, 24.707106781), (-44, 25))
            Line((-44, 25), (-82, 25))
            ThreePointArc((-82, 25), (-82.707106781, 24.707106781), (-83, 24))
            Line((-83, 24), (-83, 6))
            ThreePointArc((-83, 6), (-82.707106781, 5.292893219), (-82, 5))
        make_face()
    extrude(amount=ENL_V_MAT_EXTRU_10_DEPTH + ENL_V_MAT_EXTRU_10_DEPTH_BACK, mode=Mode.SUBTRACT)

    # Esquisse12 → Enlèv. mat.-Extru.11 (cut, through all)
    with BuildSketch(Plane.XZ):
        with BuildLine():
            Line((81.75012438, 27.165281701), (59.356069146, 8.503569006))
            ThreePointArc((59.356069146, 8.503569006), (58.761473804, 6.306887113), (60.624536078, 5))
            Line((60.624536078, 5), (83.018591312, 5))
            ThreePointArc((83.018591312, 5), (84.419658831, 5.580341169), (85, 6.981408688))
            Line((85, 6.981408688), (85, 25.643121383))
            ThreePointArc((85, 25.643121383), (83.859016499, 27.437464131), (81.75012438, 27.165281701))
        make_face()
        with BuildLine():
            Line((79.569697683, 31.85680085), (49.569697683, 6.85680085))
            ThreePointArc((49.569697683, 6.85680085), (47.441018091, 6.582064567), (46.289328883, 8.393243409))
            Line((46.289328883, 8.393243409), (46.289328883, 33.393243409))
            ThreePointArc((46.289328883, 33.393243409), (46.875115321, 34.807456972), (48.289328883, 35.393243409))
            Line((48.289328883, 35.393243409), (78.289328883, 35.393243409))
            ThreePointArc((78.289328883, 35.393243409), (80.169872039, 34.074093937), (79.569697683, 31.85680085))
        make_face()
    extrude(amount=-ENL_V_MAT_EXTRU_11_DEPTH, mode=Mode.SUBTRACT)

    # Esquisse13 → Enlèv. mat.-Extru.12 (cut, through all)
    with BuildSketch(Plane(origin=(0, 0, 0), x_dir=(-1, 0, 0), z_dir=(0, 0, -1))):
        with Locations((-21, 15)):
            Circle(ESQUISSE13_R)
    extrude(amount=-ENL_V_MAT_EXTRU_12_DEPTH, mode=Mode.SUBTRACT)

    # Esquisse14 → Enlèv. mat.-Extru.13 (cut, through all)
    with BuildSketch(Plane(origin=(0, 0, 0), x_dir=(-1, 0, 0), z_dir=(0, 0, -1))):
        with BuildLine():
            Line((-21, 5), (-81, 0))
            Line((-81, 0), (-81, -20.615224629))
            Line((-81, -20.615224629), (7.927190419, -20.615224629))
            Line((7.927190419, -20.615224629), (9.55194442, 56.956421391))
            Line((9.55194442, 56.956421391), (-81, 56.956421391))
            Line((-81, 56.956421391), (-81, 30))
            Line((-81, 30), (-21, 25))
            ThreePointArc((-21, 25), (-11, 15), (-21, 5))
        make_face()
    extrude(amount=-ENL_V_MAT_EXTRU_13_DEPTH, mode=Mode.SUBTRACT)

    # Esquisse15 → Enlèv. mat.-Extru.14 (cut)
    with BuildSketch(Plane(origin=(138, 0, 0), x_dir=(0, 0, -1), z_dir=(1, 0, 0)).offset(ENL_V_START_3)):
        with Locations((-20.25, 10.635611164)):
            Rectangle(ESQUISSE15_W, ESQUISSE15_H)
    extrude(amount=-ENL_V_MAT_EXTRU_14_DEPTH, mode=Mode.SUBTRACT)

    # Congé5
    cong_5_edges = [part.edges().sort_by_distance(p)[0] for p in [
        (33, 15, 4.5),
        (33, 15, 36),
    ]]
    fillet(cong_5_edges, radius=CONG_5_R)

    # Congé6
    cong_6_edges = [part.edges().sort_by_distance(p)[0] for p in [
        (38, 23, 30),
        (38, 23, 10.5),
        (38, 7, 10.5),
        (38, 7, 30),
    ]]
    fillet(cong_6_edges, radius=CONG_6_R)


solid = part.part
